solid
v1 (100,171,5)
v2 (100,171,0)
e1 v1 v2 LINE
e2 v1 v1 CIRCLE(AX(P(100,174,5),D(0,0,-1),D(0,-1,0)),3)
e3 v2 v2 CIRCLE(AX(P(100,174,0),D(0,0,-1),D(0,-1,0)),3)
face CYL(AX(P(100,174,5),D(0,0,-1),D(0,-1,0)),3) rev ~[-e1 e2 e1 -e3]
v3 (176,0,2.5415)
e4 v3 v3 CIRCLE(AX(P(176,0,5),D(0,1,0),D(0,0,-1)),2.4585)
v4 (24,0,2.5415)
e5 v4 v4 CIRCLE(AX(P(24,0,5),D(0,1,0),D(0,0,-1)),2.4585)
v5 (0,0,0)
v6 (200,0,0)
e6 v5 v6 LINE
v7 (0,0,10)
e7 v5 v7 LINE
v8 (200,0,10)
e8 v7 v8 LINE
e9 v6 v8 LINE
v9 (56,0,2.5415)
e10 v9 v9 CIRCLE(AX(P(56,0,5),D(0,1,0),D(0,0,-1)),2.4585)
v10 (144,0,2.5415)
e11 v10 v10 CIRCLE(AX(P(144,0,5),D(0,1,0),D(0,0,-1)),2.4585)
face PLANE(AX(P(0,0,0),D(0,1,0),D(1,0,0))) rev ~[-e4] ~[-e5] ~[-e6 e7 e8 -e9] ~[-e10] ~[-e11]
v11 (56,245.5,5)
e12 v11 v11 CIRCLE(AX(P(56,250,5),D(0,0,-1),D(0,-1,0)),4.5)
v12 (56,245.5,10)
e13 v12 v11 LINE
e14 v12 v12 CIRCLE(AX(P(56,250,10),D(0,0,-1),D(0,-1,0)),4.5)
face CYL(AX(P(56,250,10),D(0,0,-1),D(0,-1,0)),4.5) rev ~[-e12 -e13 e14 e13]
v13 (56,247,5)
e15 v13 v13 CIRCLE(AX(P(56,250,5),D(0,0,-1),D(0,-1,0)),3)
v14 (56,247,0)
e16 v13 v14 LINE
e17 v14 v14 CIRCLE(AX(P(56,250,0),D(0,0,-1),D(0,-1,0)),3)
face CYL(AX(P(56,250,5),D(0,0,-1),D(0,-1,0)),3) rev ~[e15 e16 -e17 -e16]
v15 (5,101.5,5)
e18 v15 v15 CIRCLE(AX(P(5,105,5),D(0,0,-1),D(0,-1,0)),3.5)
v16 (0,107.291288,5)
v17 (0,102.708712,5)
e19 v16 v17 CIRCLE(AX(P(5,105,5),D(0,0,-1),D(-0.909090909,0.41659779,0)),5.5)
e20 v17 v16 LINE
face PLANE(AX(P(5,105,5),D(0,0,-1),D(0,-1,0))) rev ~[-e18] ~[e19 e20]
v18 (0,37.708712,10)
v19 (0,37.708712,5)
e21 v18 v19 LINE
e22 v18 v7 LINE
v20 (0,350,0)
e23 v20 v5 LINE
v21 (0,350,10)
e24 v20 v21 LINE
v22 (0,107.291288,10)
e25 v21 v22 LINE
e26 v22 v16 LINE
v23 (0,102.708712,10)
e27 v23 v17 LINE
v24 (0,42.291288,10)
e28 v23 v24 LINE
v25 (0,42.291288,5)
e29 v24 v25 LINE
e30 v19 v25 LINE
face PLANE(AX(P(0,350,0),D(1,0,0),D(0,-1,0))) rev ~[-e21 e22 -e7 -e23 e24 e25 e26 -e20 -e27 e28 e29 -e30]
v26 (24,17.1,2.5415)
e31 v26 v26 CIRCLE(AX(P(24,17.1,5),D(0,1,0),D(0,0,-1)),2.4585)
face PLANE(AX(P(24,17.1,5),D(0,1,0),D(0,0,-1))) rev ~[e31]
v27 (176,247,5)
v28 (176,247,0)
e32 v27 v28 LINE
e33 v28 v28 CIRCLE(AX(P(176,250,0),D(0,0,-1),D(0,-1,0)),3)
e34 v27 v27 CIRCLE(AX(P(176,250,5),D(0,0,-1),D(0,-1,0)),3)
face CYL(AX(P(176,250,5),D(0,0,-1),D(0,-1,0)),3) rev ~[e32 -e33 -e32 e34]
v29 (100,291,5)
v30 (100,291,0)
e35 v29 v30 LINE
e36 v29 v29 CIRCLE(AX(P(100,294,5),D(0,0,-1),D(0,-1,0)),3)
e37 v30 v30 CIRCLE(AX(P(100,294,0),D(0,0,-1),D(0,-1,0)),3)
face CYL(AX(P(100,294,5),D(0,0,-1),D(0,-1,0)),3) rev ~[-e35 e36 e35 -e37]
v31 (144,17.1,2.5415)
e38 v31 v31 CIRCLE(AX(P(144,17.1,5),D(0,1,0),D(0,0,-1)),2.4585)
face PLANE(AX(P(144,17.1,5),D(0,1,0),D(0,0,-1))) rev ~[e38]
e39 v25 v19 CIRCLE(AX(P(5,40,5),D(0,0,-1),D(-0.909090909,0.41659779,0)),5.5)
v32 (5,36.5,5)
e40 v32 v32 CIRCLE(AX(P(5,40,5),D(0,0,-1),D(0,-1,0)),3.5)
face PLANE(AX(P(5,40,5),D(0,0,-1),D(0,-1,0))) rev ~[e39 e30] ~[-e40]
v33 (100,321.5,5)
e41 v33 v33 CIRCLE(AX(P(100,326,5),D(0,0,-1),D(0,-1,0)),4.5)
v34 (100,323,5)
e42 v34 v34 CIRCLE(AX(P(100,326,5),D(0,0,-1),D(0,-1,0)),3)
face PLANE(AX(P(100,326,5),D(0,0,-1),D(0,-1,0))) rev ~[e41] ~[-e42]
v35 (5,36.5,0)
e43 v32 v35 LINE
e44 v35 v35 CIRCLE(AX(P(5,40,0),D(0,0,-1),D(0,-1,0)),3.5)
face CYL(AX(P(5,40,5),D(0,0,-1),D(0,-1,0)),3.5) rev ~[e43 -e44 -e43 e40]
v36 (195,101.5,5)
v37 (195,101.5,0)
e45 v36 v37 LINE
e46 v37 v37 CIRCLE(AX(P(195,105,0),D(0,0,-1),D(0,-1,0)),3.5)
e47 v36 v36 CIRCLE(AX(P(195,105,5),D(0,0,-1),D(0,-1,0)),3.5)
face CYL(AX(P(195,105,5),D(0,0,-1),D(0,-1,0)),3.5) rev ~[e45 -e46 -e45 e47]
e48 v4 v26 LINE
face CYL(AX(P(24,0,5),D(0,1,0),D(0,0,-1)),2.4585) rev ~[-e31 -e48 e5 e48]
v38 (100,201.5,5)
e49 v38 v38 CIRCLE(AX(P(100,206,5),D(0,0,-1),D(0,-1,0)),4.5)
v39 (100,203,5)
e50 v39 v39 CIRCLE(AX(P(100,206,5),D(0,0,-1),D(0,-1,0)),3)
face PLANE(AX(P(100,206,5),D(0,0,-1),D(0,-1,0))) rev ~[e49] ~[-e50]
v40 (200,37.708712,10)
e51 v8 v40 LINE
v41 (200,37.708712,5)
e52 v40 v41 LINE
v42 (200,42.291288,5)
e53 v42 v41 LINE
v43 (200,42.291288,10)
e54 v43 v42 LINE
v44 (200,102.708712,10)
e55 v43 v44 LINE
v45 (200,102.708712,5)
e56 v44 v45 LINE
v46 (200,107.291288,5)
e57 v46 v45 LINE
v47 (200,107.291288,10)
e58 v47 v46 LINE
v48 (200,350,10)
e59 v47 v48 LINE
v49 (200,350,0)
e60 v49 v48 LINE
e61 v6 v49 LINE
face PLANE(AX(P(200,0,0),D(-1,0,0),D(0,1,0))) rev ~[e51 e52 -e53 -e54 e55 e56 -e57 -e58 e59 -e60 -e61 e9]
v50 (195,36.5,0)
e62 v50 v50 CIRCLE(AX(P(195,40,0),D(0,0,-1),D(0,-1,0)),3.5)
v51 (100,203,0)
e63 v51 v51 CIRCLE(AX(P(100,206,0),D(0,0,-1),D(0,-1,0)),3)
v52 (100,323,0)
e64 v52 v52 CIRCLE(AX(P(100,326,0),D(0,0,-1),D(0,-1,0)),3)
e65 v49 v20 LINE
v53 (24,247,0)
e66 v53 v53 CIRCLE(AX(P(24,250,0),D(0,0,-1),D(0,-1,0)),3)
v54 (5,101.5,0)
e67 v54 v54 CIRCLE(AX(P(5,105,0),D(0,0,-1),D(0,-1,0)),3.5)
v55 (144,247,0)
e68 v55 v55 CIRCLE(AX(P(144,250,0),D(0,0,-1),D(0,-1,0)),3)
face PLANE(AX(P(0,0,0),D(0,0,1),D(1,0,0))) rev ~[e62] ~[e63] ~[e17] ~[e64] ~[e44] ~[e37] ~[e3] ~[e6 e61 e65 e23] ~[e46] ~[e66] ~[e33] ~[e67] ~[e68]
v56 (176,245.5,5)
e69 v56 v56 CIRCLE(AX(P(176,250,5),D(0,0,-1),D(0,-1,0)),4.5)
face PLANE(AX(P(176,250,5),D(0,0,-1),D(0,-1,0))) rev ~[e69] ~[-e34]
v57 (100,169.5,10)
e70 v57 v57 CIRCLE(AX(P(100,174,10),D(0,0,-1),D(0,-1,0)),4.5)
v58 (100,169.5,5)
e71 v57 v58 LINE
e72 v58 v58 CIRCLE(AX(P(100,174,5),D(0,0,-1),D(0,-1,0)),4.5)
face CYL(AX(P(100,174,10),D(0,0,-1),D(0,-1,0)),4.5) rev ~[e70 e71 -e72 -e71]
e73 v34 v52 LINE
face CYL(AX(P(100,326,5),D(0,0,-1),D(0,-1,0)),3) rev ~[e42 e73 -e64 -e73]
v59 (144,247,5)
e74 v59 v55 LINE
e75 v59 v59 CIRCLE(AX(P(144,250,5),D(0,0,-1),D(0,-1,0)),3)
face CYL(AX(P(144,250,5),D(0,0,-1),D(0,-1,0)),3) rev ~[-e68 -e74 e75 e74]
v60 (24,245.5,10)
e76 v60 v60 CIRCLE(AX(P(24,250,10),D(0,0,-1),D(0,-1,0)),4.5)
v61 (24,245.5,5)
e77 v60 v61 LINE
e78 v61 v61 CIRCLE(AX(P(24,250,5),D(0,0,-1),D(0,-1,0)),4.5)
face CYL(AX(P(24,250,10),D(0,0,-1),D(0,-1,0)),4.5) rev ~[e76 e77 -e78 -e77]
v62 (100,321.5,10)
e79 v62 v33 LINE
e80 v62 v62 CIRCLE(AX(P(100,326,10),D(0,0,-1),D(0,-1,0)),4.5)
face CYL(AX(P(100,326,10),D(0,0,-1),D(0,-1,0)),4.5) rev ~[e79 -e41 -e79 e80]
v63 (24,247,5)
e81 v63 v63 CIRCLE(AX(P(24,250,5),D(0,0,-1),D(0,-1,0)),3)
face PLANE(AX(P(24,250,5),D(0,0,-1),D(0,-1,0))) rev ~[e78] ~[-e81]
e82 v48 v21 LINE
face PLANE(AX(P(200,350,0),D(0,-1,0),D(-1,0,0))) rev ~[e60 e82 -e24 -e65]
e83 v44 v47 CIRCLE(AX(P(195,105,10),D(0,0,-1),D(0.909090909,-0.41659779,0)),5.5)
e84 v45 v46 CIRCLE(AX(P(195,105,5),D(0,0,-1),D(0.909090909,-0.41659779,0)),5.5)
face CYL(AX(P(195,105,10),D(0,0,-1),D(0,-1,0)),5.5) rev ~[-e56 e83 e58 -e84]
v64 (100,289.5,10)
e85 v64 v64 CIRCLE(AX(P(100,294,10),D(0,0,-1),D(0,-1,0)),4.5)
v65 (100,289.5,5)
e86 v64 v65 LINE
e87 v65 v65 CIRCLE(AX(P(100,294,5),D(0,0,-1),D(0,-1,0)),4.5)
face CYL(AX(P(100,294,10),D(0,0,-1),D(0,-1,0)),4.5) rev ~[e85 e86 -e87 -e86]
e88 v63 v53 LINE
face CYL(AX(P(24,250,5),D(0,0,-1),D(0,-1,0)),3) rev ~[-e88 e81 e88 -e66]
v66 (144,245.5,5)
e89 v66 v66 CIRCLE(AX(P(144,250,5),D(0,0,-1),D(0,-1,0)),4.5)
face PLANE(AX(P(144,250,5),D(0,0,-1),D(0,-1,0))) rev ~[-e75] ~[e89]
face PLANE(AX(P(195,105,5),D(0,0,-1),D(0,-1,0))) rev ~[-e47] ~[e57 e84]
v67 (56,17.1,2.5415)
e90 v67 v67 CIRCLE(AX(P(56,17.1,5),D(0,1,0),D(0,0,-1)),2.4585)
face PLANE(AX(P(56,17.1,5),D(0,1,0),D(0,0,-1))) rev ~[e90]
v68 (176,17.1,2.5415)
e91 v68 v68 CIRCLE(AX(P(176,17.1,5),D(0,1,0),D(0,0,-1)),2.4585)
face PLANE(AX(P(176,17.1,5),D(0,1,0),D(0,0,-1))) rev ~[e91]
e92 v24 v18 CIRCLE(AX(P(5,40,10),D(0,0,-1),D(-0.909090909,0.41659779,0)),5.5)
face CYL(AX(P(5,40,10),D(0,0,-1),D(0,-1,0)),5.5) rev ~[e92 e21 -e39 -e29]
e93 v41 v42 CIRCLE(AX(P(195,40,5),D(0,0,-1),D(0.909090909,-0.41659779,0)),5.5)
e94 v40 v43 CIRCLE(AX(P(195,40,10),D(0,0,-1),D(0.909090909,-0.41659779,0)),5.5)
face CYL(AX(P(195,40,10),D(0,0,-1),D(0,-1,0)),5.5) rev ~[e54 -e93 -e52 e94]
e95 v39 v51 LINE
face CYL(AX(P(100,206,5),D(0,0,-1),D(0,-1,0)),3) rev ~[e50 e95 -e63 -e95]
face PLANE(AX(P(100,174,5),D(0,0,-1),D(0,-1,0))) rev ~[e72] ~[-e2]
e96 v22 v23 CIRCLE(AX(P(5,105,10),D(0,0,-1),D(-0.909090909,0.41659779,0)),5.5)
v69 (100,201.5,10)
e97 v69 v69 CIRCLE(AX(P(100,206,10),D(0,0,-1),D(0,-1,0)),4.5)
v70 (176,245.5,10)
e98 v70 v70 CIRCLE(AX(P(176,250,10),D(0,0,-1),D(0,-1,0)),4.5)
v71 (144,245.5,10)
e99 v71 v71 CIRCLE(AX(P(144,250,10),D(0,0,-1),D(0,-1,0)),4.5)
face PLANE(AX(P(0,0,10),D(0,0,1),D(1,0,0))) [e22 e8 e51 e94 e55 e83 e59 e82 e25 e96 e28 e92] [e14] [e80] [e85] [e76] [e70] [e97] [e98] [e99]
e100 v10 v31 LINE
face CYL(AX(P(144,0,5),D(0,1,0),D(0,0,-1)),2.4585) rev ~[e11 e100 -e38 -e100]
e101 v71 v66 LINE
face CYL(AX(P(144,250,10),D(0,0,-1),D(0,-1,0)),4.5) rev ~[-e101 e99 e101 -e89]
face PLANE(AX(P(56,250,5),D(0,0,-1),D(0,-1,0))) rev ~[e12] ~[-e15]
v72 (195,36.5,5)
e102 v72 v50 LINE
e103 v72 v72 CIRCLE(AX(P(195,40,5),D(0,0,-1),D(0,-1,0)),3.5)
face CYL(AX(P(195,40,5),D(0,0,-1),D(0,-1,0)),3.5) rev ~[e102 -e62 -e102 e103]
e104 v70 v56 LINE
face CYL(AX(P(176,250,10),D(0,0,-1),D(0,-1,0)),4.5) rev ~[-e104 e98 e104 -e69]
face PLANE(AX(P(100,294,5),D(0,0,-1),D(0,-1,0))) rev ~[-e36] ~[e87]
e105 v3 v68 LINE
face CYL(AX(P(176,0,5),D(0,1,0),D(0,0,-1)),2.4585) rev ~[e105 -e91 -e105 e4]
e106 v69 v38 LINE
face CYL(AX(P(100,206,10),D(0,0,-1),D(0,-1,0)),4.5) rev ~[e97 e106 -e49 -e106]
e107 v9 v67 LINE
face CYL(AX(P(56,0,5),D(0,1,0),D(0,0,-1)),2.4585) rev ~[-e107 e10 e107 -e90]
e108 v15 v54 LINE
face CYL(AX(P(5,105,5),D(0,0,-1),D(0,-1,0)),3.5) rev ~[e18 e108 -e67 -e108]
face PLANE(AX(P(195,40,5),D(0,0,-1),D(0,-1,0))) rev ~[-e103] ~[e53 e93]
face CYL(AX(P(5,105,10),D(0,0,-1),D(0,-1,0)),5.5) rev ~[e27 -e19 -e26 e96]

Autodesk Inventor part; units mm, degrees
ref_plane "YZ Plane" through (0, 0, 0) normal (1, 0, 0) x (0, 1, 0)
ref_plane "XZ Plane" through (0, 0, 0) normal (0, 1, 0) x (-1, 0, 0)
ref_plane "XY Plane" through (0, 0, 0) normal (0, 0, 1) x (1, 0, 0)
sketch "Sketch1" plane through (0, 0, 0) normal (0, 0, 1) x (1, 0, 0)
  line L0 (0, 0) -> (200, 0)
  line L1 (200, 0) -> (200, 350)
  line L2 (200, 350) -> (0, 350)
  line L3 (0, 350) -> (0, 0)
  dimension "d0" = 200
  dimension "d1" = 350
extrude "Extrusion1" add sketch "Sketch1" along normal blind 10
sketch "Sketch2" plane through (0, 0, 10) normal (0, 0, 1) x (1, 0, 0)
  circle A0 centre (144, 250) radius 2.067 projected
  circle A1 centre (176, 250) radius 2.067 projected
  circle A2 centre (100, 326) radius 2.067 projected
  circle A3 centre (100, 294) radius 2.067 projected
  circle A4 centre (56, 250) radius 2.067 projected
  circle A5 centre (24, 250) radius 2.067 projected
  circle A6 centre (100, 206) radius 2.067 projected
  circle A7 centre (100, 174) radius 2.067 projected
  point P0 (0, 0)
hole "Hole1" at (24, 250, 10) at (56, 250, 10) at (100, 294, 10) at (100, 326, 10) at (144, 250, 10) at (176, 250, 10) at (100, 206, 10) at (100, 174, 10) direction (0, 0, -1) diameter 6 end through all counterbore diameter 9 counterbore depth 5
sketch "Sketch3" plane through (0, 0, 0) normal (0, -1, 0) x (1, 0, 0)
  line L0 (0, 0) -> (0, 10) projected
  line L1 (0, 5) -> (200, 5)
  line L2 (200, 0) -> (200, 10) projected
  circle A0 centre (24, 5) radius 3
  circle A1 centre (56, 5) radius 3
  circle A2 centre (144, 5) radius 3
  circle A3 centre (176, 5) radius 3
  dimension "d11" = 6
  dimension "d12" = 6
  dimension "d13" = 6
  dimension "d14" = 6
  dimension "d15" = 24
  dimension "d16" = 56
  dimension "d17" = 24
  dimension "d18" = 56
hole "Hole2" at (24, 0, 5) at (56, 0, 5) at (144, 0, 5) at (176, 0, 5) direction (0, 1, 0) diameter 4.917 depth 17.1 thread size "M6x1" class "6H" standard "ISO Metric profile"
sketch "Sketch4" plane through (0, 0, 10) normal (0, 0, 1) x (1, 0, 0)
  circle A0 centre (195, 40) radius 2.5941 projected
  circle A1 centre (195, 105) radius 2.5941 projected
  circle A2 centre (5, 105) radius 2.5941 projected
  circle A3 centre (5, 40) radius 2.5941 projected
  point P0 (0, 0)
hole "Hole3" at (5, 105, 10) at (5, 40, 10) at (195, 105, 10) at (195, 40, 10) direction (0, 0, -1) diameter 7 end through all counterbore diameter 11 counterbore depth 5
properties part number "290x200(10li)"
